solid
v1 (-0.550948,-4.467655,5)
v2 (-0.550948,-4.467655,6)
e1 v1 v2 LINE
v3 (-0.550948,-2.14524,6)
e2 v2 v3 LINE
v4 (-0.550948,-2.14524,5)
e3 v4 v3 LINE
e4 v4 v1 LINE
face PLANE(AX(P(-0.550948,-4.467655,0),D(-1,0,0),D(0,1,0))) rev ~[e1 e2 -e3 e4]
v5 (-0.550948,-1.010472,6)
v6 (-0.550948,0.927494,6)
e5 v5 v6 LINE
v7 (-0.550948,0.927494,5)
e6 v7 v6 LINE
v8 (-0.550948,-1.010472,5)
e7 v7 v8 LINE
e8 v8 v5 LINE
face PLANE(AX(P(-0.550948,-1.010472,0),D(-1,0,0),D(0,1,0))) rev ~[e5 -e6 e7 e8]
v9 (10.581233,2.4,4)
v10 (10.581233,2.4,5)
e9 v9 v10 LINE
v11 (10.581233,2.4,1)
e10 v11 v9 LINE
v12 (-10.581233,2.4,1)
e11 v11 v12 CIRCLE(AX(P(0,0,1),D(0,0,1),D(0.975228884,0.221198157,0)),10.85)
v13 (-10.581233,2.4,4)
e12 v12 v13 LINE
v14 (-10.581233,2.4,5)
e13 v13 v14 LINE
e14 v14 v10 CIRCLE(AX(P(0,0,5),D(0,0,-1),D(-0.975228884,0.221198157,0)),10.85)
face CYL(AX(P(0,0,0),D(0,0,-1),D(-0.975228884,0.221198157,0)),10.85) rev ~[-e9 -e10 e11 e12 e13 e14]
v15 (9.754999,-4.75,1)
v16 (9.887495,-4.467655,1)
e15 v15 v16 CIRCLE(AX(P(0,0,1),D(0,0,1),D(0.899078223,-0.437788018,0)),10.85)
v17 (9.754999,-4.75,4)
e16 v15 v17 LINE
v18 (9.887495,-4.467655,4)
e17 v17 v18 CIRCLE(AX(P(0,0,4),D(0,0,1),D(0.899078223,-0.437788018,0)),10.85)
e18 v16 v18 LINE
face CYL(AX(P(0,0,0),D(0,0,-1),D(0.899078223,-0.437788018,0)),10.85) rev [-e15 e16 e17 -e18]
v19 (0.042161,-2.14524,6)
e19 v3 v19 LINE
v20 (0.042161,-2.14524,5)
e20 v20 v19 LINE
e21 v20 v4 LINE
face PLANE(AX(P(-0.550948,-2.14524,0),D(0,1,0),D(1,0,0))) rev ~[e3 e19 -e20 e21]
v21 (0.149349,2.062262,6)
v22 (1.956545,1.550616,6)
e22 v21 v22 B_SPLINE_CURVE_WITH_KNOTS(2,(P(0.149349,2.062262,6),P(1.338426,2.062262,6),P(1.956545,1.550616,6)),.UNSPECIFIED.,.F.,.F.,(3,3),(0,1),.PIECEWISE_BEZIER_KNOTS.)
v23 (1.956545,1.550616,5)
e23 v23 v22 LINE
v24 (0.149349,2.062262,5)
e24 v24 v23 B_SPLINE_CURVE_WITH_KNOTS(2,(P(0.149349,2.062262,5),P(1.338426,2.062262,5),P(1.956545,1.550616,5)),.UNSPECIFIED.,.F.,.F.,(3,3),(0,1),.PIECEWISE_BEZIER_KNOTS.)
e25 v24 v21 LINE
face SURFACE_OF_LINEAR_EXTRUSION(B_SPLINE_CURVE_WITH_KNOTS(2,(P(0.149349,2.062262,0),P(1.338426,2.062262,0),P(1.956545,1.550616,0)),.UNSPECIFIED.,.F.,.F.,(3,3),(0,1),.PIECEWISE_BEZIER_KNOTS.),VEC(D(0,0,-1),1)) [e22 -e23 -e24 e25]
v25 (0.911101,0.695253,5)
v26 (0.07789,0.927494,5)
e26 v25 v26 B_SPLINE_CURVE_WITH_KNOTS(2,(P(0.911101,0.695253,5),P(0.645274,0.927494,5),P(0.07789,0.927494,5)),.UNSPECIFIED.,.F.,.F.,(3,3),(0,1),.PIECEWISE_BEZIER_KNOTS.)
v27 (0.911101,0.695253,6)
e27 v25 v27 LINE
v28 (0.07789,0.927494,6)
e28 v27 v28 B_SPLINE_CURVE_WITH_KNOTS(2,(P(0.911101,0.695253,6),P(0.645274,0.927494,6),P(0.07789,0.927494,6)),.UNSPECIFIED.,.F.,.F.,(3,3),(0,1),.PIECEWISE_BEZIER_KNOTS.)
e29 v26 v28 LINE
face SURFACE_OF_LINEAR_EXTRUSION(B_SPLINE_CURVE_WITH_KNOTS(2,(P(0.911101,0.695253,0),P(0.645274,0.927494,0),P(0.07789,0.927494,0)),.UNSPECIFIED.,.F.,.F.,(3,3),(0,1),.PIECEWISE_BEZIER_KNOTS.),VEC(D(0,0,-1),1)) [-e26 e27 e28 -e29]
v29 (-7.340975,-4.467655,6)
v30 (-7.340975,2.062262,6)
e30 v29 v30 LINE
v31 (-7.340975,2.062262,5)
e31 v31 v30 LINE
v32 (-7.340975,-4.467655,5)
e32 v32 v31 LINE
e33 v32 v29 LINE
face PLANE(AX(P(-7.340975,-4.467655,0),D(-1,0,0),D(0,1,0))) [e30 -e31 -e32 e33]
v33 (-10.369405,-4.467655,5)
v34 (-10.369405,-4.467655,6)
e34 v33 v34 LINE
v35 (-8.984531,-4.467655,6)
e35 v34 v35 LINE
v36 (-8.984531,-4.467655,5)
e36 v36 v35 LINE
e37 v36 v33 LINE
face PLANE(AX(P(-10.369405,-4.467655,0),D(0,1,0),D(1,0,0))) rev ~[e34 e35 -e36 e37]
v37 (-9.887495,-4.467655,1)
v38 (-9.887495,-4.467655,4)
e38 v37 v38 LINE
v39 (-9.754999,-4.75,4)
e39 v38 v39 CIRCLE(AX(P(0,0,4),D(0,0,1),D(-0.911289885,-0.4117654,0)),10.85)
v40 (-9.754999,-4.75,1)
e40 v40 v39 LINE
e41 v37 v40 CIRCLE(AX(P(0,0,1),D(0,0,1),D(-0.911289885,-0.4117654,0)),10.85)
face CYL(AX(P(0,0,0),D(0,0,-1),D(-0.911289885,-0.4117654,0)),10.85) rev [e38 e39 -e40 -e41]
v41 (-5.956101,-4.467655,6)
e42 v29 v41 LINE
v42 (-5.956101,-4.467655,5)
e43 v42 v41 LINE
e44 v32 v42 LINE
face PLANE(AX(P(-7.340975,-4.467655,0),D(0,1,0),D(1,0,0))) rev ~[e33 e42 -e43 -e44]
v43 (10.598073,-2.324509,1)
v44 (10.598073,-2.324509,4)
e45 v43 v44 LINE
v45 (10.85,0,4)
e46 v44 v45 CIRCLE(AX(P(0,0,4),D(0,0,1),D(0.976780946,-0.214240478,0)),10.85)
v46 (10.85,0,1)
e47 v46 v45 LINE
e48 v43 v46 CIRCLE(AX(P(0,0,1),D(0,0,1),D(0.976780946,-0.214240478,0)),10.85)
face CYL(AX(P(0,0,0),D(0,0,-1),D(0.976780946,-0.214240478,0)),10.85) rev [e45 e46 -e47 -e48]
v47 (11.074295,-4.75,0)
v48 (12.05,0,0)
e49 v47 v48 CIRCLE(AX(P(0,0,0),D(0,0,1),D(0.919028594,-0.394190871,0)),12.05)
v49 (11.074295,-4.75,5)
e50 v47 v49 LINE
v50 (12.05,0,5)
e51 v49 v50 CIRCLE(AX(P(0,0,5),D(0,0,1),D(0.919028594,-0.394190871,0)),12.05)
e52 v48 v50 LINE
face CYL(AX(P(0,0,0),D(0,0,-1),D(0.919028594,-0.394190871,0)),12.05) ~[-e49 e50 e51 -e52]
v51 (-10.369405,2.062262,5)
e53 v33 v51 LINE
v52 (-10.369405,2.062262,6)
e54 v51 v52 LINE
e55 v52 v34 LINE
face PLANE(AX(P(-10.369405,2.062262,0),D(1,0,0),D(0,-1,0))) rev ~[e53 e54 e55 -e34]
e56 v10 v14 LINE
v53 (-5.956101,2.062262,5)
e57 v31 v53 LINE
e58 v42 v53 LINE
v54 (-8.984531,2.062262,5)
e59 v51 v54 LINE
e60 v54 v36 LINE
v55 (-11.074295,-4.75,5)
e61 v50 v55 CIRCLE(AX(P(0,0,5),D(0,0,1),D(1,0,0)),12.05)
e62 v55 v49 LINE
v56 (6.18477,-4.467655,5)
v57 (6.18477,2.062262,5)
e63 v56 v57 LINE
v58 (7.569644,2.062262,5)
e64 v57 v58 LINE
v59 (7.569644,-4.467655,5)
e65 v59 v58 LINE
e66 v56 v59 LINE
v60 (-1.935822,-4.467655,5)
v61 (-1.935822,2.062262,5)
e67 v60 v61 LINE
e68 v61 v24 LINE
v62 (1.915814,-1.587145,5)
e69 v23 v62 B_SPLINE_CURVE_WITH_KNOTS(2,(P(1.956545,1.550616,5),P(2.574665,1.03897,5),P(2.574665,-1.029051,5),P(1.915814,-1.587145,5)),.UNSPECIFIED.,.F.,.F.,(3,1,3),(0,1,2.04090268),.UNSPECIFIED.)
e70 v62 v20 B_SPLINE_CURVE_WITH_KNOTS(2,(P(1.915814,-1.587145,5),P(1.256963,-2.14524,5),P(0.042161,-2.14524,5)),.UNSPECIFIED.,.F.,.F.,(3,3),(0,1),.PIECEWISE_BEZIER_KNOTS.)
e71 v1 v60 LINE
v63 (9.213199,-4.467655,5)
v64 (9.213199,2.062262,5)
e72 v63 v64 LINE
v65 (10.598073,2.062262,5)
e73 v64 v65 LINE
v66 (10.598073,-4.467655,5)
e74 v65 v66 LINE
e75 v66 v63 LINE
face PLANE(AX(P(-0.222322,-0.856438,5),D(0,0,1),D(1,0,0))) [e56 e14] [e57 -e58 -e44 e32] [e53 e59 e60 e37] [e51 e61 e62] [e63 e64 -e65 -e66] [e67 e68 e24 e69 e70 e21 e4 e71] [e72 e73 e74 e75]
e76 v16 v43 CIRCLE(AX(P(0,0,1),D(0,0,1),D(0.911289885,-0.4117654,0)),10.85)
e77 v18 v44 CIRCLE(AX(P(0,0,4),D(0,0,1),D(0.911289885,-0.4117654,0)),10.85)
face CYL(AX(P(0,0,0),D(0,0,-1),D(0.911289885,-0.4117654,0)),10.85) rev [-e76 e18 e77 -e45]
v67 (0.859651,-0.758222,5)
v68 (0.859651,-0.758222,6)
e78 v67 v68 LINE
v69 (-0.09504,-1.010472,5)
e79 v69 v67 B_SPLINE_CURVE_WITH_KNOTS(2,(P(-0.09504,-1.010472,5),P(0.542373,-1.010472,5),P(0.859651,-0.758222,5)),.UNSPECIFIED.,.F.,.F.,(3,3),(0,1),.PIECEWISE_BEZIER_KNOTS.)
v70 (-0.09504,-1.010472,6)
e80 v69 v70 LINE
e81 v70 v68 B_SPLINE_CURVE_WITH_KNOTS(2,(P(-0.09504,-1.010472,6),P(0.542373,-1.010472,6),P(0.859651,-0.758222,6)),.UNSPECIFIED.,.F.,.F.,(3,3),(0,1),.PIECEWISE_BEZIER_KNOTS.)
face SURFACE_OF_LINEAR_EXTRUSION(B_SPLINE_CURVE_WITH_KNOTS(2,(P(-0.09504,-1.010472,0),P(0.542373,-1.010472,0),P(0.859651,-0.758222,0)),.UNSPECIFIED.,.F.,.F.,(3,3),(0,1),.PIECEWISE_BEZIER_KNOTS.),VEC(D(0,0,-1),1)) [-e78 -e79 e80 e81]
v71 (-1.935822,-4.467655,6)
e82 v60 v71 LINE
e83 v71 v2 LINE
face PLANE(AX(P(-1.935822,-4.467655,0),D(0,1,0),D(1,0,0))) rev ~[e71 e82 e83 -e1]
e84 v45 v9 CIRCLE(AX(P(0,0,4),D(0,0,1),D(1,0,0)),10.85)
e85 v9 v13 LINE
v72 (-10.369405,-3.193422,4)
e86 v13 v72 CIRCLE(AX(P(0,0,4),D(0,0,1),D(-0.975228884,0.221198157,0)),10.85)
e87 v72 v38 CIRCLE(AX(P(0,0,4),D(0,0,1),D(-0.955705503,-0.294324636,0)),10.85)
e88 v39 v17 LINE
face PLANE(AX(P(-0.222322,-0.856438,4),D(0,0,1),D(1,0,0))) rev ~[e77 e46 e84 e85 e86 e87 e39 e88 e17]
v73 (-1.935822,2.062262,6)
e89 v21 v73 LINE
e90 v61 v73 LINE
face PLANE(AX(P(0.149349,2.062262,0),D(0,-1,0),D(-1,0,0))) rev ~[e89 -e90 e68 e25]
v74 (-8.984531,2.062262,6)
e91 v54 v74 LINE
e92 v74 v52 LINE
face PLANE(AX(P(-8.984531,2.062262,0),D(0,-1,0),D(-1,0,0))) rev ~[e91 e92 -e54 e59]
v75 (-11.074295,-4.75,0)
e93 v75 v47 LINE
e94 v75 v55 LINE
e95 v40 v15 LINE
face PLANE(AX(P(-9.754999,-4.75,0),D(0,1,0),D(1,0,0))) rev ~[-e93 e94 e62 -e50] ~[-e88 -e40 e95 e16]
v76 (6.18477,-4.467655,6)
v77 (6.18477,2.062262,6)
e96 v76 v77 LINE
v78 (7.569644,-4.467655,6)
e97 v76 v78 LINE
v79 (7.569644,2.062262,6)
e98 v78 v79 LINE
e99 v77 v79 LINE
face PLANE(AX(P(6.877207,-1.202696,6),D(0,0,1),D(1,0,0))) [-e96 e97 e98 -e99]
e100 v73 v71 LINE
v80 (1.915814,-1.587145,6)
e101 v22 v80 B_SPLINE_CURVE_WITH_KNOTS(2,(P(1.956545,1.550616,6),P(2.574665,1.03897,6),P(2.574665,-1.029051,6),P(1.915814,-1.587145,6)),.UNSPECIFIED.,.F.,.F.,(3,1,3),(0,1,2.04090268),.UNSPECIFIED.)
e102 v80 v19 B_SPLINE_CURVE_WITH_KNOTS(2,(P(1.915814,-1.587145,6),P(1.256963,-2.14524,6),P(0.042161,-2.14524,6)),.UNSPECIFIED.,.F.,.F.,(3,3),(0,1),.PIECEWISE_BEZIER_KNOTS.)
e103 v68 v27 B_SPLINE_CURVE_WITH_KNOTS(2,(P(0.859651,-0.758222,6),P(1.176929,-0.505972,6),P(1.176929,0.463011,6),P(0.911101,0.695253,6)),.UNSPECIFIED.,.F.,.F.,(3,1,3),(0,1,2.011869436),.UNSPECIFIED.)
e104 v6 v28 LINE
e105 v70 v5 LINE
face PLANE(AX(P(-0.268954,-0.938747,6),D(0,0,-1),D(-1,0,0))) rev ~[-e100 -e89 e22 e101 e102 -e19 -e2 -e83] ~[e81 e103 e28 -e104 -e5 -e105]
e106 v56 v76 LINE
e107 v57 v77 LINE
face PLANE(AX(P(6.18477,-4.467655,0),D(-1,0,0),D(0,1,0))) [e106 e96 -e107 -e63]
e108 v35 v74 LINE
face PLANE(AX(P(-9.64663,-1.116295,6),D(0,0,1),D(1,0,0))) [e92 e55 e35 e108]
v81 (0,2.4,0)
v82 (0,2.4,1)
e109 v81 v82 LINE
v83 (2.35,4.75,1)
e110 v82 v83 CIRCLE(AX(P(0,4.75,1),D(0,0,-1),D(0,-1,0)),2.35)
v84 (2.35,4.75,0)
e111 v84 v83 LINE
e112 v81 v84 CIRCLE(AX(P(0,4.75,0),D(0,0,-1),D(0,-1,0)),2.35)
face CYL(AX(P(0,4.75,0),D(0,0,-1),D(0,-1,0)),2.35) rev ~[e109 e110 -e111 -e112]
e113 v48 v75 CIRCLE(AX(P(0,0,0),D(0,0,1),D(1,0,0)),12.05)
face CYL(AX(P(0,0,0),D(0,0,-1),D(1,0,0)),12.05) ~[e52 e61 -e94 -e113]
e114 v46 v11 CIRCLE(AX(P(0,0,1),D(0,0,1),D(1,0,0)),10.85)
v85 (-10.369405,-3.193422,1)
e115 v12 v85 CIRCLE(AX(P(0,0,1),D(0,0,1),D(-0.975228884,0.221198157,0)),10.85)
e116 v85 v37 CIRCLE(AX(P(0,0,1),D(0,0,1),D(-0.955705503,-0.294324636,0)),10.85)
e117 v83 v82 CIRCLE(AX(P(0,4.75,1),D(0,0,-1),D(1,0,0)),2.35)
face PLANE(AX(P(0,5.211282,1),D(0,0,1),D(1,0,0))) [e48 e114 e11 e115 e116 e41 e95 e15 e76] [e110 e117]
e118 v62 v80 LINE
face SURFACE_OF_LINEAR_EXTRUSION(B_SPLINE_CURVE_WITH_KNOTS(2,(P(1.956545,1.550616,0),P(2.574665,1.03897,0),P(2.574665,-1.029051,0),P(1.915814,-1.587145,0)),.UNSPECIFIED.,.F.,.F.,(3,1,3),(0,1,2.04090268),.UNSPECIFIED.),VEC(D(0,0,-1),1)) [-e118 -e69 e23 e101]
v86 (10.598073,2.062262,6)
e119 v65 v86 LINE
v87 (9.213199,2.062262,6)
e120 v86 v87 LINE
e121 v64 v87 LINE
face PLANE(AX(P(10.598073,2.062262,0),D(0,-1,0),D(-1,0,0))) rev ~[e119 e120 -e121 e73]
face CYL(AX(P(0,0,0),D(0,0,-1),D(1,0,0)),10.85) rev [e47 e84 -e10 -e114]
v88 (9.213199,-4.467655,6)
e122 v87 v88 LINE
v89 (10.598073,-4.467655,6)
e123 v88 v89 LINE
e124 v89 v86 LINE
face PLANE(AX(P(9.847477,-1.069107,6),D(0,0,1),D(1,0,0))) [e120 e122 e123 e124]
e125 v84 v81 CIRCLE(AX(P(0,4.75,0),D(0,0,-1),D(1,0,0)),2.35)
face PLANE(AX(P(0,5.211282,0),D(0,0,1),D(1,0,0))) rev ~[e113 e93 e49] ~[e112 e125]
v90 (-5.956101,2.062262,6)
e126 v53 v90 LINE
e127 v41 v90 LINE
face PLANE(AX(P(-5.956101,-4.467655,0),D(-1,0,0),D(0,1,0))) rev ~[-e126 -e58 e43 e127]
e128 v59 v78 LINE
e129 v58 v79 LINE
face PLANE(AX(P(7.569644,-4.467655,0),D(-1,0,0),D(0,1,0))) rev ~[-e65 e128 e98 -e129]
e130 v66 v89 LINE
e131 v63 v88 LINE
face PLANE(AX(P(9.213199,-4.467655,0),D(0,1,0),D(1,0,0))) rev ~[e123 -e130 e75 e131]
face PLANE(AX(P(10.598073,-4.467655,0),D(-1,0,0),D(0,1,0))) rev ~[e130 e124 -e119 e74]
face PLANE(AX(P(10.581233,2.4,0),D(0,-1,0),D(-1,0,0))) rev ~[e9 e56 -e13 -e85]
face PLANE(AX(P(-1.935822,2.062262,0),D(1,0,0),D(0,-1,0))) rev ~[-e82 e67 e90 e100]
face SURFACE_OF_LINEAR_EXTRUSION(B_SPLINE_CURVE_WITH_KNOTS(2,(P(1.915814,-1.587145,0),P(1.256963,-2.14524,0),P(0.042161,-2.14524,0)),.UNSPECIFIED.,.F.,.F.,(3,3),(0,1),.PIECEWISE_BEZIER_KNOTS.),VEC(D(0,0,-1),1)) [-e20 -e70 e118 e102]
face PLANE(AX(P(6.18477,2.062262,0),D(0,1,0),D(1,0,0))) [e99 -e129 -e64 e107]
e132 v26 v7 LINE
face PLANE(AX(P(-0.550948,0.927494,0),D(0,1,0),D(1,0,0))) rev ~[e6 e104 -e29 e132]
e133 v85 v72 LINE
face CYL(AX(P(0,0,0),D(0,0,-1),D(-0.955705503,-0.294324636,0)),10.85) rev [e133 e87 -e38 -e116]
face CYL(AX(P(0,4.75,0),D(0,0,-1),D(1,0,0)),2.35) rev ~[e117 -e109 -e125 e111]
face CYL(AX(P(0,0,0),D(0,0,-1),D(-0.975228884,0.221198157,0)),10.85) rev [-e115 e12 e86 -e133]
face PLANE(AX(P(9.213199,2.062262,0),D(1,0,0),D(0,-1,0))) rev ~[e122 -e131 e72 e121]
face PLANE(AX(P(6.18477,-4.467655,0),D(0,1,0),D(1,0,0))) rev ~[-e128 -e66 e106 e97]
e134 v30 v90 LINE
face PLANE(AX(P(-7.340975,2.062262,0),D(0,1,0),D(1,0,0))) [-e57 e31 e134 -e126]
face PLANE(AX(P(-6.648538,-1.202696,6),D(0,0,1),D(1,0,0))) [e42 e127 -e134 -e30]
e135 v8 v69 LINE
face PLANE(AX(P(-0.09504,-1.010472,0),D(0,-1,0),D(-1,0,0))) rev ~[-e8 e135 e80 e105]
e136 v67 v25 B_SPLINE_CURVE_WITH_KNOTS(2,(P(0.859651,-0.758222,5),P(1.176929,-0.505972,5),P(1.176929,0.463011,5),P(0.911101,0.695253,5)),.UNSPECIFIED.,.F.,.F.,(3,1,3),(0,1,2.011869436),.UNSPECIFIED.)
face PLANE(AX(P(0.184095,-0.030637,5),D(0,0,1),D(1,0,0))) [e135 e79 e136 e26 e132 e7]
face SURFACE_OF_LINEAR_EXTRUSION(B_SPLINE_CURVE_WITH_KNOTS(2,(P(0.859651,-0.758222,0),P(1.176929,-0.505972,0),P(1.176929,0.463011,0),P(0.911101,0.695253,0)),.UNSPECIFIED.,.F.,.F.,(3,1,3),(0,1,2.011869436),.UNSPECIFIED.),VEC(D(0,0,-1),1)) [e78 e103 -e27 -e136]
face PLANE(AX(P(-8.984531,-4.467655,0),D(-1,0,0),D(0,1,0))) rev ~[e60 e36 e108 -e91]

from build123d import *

# Parameters (mm, degrees)
F0_W     = 1.3848739799
F0_H     = 6.5299166297
F1_DEPTH = 5
F2_DEPTH = 6
F3_DEPTH = 4
F4_DEPTH = 1


# Not quite as in the source:
# - a feature names something its author has since deleted; it is built from what else it names


with BuildPart() as f1:
    # F0 (on Top) → F1 (new body)
    with BuildSketch(Plane.XY):
        with BuildLine():
            ThreePointArc((-9.8874952566, -4.4676545918), (-9.8222615585, -4.6093034047), (-9.7549987186, -4.75))
            Line((-9.7549987186, -4.75), (9.7549987186, -4.75))
            ThreePointArc((9.7549987186, -4.75), (9.8222615585, -4.6093034047), (9.8874952566, -4.4676545918))
            Line((9.8874952566, -4.4676545918), (9.2131992894, -4.4676545918))
            Line((9.2131992894, -4.4676545918), (9.2131992894, 2.062262038))
            Line((9.2131992894, 2.062262038), (10.5980732693, 2.062262038))
            Line((10.5980732693, 2.062262038), (10.5980732693, -2.3245091907))
            ThreePointArc((10.5980732693, -2.3245091907), (10.7868344516, -1.1690605262), (10.85, 0))
            ThreePointArc((10.85, 0), (10.7825989969, 1.2075010861), (10.5812333875, 2.4))
            Line((10.5812333875, 2.4), (0, 2.4))
            Line((0, 2.4), (-10.5812333875, 2.4))
            ThreePointArc((-10.5812333875, 2.4), (-10.8422277422, -0.4106063639), (-10.3694047071, -3.1934223053))
            Line((-10.3694047071, -3.1934223053), (-10.3694047071, 2.062262038))
            Line((-10.3694047071, 2.062262038), (-8.9845307272, 2.062262038))
            Line((-8.9845307272, 2.062262038), (-8.9845307272, -4.4676545918))
            Line((-8.9845307272, -4.4676545918), (-9.8874952566, -4.4676545918))
        make_face()
        with Locations((-6.6485384464, -1.2026962769)):
            Rectangle(F0_W, F0_H, mode=Mode.SUBTRACT)
        with BuildLine():
            add(Edge.make_bspline(
                [(1.9565453854, 1.55061613), (2.5746650927, 1.0389702221), (2.5746650927, 0.0256826557)],
                knots=[0, 0, 0, 1, 1, 1], degree=2))
            add(Edge.make_bspline(
                [(2.5746650927, 0.0256826557), (2.5746650927, -1.0290510875), (1.9158137978, -1.5871452971)],
                knots=[0, 0, 0, 1, 1, 1], degree=2))
            add(Edge.make_bspline(
                [(1.9158137978, -1.5871452971), (1.2569625029, -2.1452395068), (0.0421607662, -2.1452395068)],
                knots=[0, 0, 0, 1, 1, 1], degree=2))
            Line((0.0421607662, -2.1452395068), (-0.5509483171, -2.1452395068))
            Line((-0.5509483171, -2.1452395068), (-0.5509483171, -4.4676545918))
            Line((-0.5509483171, -4.4676545918), (-1.935822297, -4.4676545918))
            Line((-1.935822297, -4.4676545918), (-1.935822297, 2.062262038))
            Line((-1.935822297, 2.062262038), (0.1493491547, 2.062262038))
            add(Edge.make_bspline(
                [(0.1493491547, 2.062262038), (1.3384256782, 2.062262038), (1.9565453854, 1.55061613)],
                knots=[0, 0, 0, 1, 1, 1], degree=2))
        make_face(mode=Mode.SUBTRACT)
        with Locations((6.8772070086, -1.2026962769)):
            Rectangle(F0_W, F0_H, mode=Mode.SUBTRACT)
        with BuildLine():
            ThreePointArc((11.0742945599, -4.75), (11.8035534787, -2.4245876508), (12.05, 0))
            ThreePointArc((12.05, 0), (-2.4245876508, 11.8035534787), (-11.0742945599, -4.75))
            Line((-11.0742945599, -4.75), (-9.7549987186, -4.75))
            ThreePointArc((-9.7549987186, -4.75), (-9.8222615585, -4.6093034047), (-9.8874952566, -4.4676545918))
            Line((-9.8874952566, -4.4676545918), (-10.3694047071, -4.4676545918))
            Line((-10.3694047071, -4.4676545918), (-10.3694047071, -3.1934223053))
            ThreePointArc((-10.3694047071, -3.1934223053), (-10.8422277422, -0.4106063639), (-10.5812333875, 2.4))
            ThreePointArc((-10.5812333875, 2.4), (0, 10.85), (10.5812333875, 2.4))
            ThreePointArc((10.5812333875, 2.4), (10.7825989969, 1.2075010861), (10.85, 0))
            ThreePointArc((10.85, 0), (10.7868344516, -1.1690605262), (10.5980732693, -2.3245091907))
            Line((10.5980732693, -2.3245091907), (10.5980732693, -4.4676545918))
            Line((10.5980732693, -4.4676545918), (9.8874952566, -4.4676545918))
            ThreePointArc((9.8874952566, -4.4676545918), (9.8222615585, -4.6093034047), (9.7549987186, -4.75))
            Line((9.7549987186, -4.75), (11.0742945599, -4.75))
        make_face()
        with BuildLine():
            Line((-0.5509483171, 0.927494298), (-0.5509483171, -1.0104717668))
            Line((-0.5509483171, -1.0104717668), (-0.0950403712, -1.0104717668))
            add(Edge.make_bspline(
                [(-0.0950403712, -1.0104717668), (0.542373246, -1.0104717668), (0.8596508761, -0.7582217591)],
                knots=[0, 0, 0, 1, 1, 1], degree=2))
            add(Edge.make_bspline(
                [(0.8596508761, -0.7582217591), (1.1769285061, -0.5059717514), (1.1769285061, -0.0243385922)],
                knots=[0, 0, 0, 1, 1, 1], degree=2))
            add(Edge.make_bspline(
                [(1.1769285061, -0.0243385922), (1.1769285061, 0.463011281), (0.9111013026, 0.6952527895)],
                knots=[0, 0, 0, 1, 1, 1], degree=2))
            add(Edge.make_bspline(
                [(0.9111013026, 0.6952527895), (0.645274099, 0.927494298), (0.077890229, 0.927494298)],
                knots=[0, 0, 0, 1, 1, 1], degree=2))
            Line((0.077890229, 0.927494298), (-0.5509483171, 0.927494298))
        make_face()
    extrude(amount=F1_DEPTH)

    # F0 (on Top) → F2 (join)
    with BuildSketch(Plane.XY):
        with BuildLine():
            ThreePointArc((-10.3694047071, -3.1934223053), (-10.1484686537, -3.8381094285), (-9.8874952566, -4.4676545918))
            Line((-9.8874952566, -4.4676545918), (-8.9845307272, -4.4676545918))
            Line((-8.9845307272, -4.4676545918), (-8.9845307272, 2.062262038))
            Line((-8.9845307272, 2.062262038), (-10.3694047071, 2.062262038))
            Line((-10.3694047071, 2.062262038), (-10.3694047071, -3.1934223053))
        make_face()
        with BuildLine():
            Line((-10.3694047071, -4.4676545918), (-9.8874952566, -4.4676545918))
            ThreePointArc((-9.8874952566, -4.4676545918), (-10.1484686537, -3.8381094285), (-10.3694047071, -3.1934223053))
            Line((-10.3694047071, -3.1934223053), (-10.3694047071, -4.4676545918))
        make_face()
        with Locations((-6.6485384464, -1.2026962769)):
            Rectangle(F0_W, F0_H)
        with BuildLine():
            add(Edge.make_bspline(
                [(2.5746650927, 0.0256826557), (2.5746650927, -1.0290510875), (1.9158137978, -1.5871452971)],
                knots=[0, 0, 0, 1, 1, 1], degree=2))
            add(Edge.make_bspline(
                [(1.9565453854, 1.55061613), (2.5746650927, 1.0389702221), (2.5746650927, 0.0256826557)],
                knots=[0, 0, 0, 1, 1, 1], degree=2))
            add(Edge.make_bspline(
                [(0.1493491547, 2.062262038), (1.3384256782, 2.062262038), (1.9565453854, 1.55061613)],
                knots=[0, 0, 0, 1, 1, 1], degree=2))
            Line((0.1493491547, 2.062262038), (-1.935822297, 2.062262038))
            Line((-1.935822297, 2.062262038), (-1.935822297, -4.4676545918))
            Line((-1.935822297, -4.4676545918), (-0.5509483171, -4.4676545918))
            Line((-0.5509483171, -4.4676545918), (-0.5509483171, -2.1452395068))
            Line((-0.5509483171, -2.1452395068), (0.0421607662, -2.1452395068))
            add(Edge.make_bspline(
                [(1.9158137978, -1.5871452971), (1.2569625029, -2.1452395068), (0.0421607662, -2.1452395068)],
                knots=[0, 0, 0, 1, 1, 1], degree=2))
        make_face()
        with BuildLine():
            Line((-0.0950403712, -1.0104717668), (-0.5509483171, -1.0104717668))
            Line((-0.5509483171, -1.0104717668), (-0.5509483171, 0.927494298))
            Line((-0.5509483171, 0.927494298), (0.077890229, 0.927494298))
            add(Edge.make_bspline(
                [(0.9111013026, 0.6952527895), (0.645274099, 0.927494298), (0.077890229, 0.927494298)],
                knots=[0, 0, 0, 1, 1, 1], degree=2))
            add(Edge.make_bspline(
                [(1.1769285061, -0.0243385922), (1.1769285061, 0.463011281), (0.9111013026, 0.6952527895)],
                knots=[0, 0, 0, 1, 1, 1], degree=2))
            add(Edge.make_bspline(
                [(0.8596508761, -0.7582217591), (1.1769285061, -0.5059717514), (1.1769285061, -0.0243385922)],
                knots=[0, 0, 0, 1, 1, 1], degree=2))
            add(Edge.make_bspline(
                [(-0.0950403712, -1.0104717668), (0.542373246, -1.0104717668), (0.8596508761, -0.7582217591)],
                knots=[0, 0, 0, 1, 1, 1], degree=2))
        make_face(mode=Mode.SUBTRACT)
        with Locations((6.8772070086, -1.2026962769)):
            Rectangle(F0_W, F0_H)
        with BuildLine():
            Line((9.2131992894, -4.4676545918), (9.8874952566, -4.4676545918))
            ThreePointArc((9.8874952566, -4.4676545918), (10.2986842611, -3.4146160092), (10.5980732693, -2.3245091907))
            Line((10.5980732693, -2.3245091907), (10.5980732693, 2.062262038))
            Line((10.5980732693, 2.062262038), (9.2131992894, 2.062262038))
            Line((9.2131992894, 2.062262038), (9.2131992894, -4.4676545918))
        make_face()
        with BuildLine():
            ThreePointArc((10.5980732693, -2.3245091907), (10.2986842611, -3.4146160092), (9.8874952566, -4.4676545918))
            Line((9.8874952566, -4.4676545918), (10.5980732693, -4.4676545918))
            Line((10.5980732693, -4.4676545918), (10.5980732693, -2.3245091907))
        make_face()
    extrude(amount=F2_DEPTH)

    # F0 (on Top) → F3 (cut)
    with BuildSketch(Plane.XY):
        with BuildLine():
            ThreePointArc((-9.8874952566, -4.4676545918), (-9.8222615585, -4.6093034047), (-9.7549987186, -4.75))
            Line((-9.7549987186, -4.75), (9.7549987186, -4.75))
            ThreePointArc((9.7549987186, -4.75), (9.8222615585, -4.6093034047), (9.8874952566, -4.4676545918))
            Line((9.8874952566, -4.4676545918), (9.2131992894, -4.4676545918))
            Line((9.2131992894, -4.4676545918), (9.2131992894, 2.062262038))
            Line((9.2131992894, 2.062262038), (10.5980732693, 2.062262038))
            Line((10.5980732693, 2.062262038), (10.5980732693, -2.3245091907))
            ThreePointArc((10.5980732693, -2.3245091907), (10.7868344516, -1.1690605262), (10.85, 0))
            ThreePointArc((10.85, 0), (10.7825989969, 1.2075010861), (10.5812333875, 2.4))
            Line((10.5812333875, 2.4), (0, 2.4))
            Line((0, 2.4), (-10.5812333875, 2.4))
            ThreePointArc((-10.5812333875, 2.4), (-10.8422277422, -0.4106063639), (-10.3694047071, -3.1934223053))
            Line((-10.3694047071, -3.1934223053), (-10.3694047071, 2.062262038))
            Line((-10.3694047071, 2.062262038), (-8.9845307272, 2.062262038))
            Line((-8.9845307272, 2.062262038), (-8.9845307272, -4.4676545918))
            Line((-8.9845307272, -4.4676545918), (-9.8874952566, -4.4676545918))
        make_face()
        with Locations((-6.6485384464, -1.2026962769)):
            Rectangle(F0_W, F0_H, mode=Mode.SUBTRACT)
        with BuildLine():
            add(Edge.make_bspline(
                [(1.9565453854, 1.55061613), (2.5746650927, 1.0389702221), (2.5746650927, 0.0256826557)],
                knots=[0, 0, 0, 1, 1, 1], degree=2))
            add(Edge.make_bspline(
                [(2.5746650927, 0.0256826557), (2.5746650927, -1.0290510875), (1.9158137978, -1.5871452971)],
                knots=[0, 0, 0, 1, 1, 1], degree=2))
            add(Edge.make_bspline(
                [(1.9158137978, -1.5871452971), (1.2569625029, -2.1452395068), (0.0421607662, -2.1452395068)],
                knots=[0, 0, 0, 1, 1, 1], degree=2))
            Line((0.0421607662, -2.1452395068), (-0.5509483171, -2.1452395068))
            Line((-0.5509483171, -2.1452395068), (-0.5509483171, -4.4676545918))
            Line((-0.5509483171, -4.4676545918), (-1.935822297, -4.4676545918))
            Line((-1.935822297, -4.4676545918), (-1.935822297, 2.062262038))
            Line((-1.935822297, 2.062262038), (0.1493491547, 2.062262038))
            add(Edge.make_bspline(
                [(0.1493491547, 2.062262038), (1.3384256782, 2.062262038), (1.9565453854, 1.55061613)],
                knots=[0, 0, 0, 1, 1, 1], degree=2))
        make_face(mode=Mode.SUBTRACT)
        with Locations((6.8772070086, -1.2026962769)):
            Rectangle(F0_W, F0_H, mode=Mode.SUBTRACT)
        with BuildLine():
            ThreePointArc((-10.3694047071, -3.1934223053), (-10.1484686537, -3.8381094285), (-9.8874952566, -4.4676545918))
            Line((-9.8874952566, -4.4676545918), (-8.9845307272, -4.4676545918))
            Line((-8.9845307272, -4.4676545918), (-8.9845307272, 2.062262038))
            Line((-8.9845307272, 2.062262038), (-10.3694047071, 2.062262038))
            Line((-10.3694047071, 2.062262038), (-10.3694047071, -3.1934223053))
        make_face()
        with Locations((-6.6485384464, -1.2026962769)):
            Rectangle(F0_W, F0_H)
        with BuildLine():
            add(Edge.make_bspline(
                [(2.5746650927, 0.0256826557), (2.5746650927, -1.0290510875), (1.9158137978, -1.5871452971)],
                knots=[0, 0, 0, 1, 1, 1], degree=2))
            add(Edge.make_bspline(
                [(1.9565453854, 1.55061613), (2.5746650927, 1.0389702221), (2.5746650927, 0.0256826557)],
                knots=[0, 0, 0, 1, 1, 1], degree=2))
            add(Edge.make_bspline(
                [(0.1493491547, 2.062262038), (1.3384256782, 2.062262038), (1.9565453854, 1.55061613)],
                knots=[0, 0, 0, 1, 1, 1], degree=2))
            Line((0.1493491547, 2.062262038), (-1.935822297, 2.062262038))
            Line((-1.935822297, 2.062262038), (-1.935822297, -4.4676545918))
            Line((-1.935822297, -4.4676545918), (-0.5509483171, -4.4676545918))
            Line((-0.5509483171, -4.4676545918), (-0.5509483171, -2.1452395068))
            Line((-0.5509483171, -2.1452395068), (0.0421607662, -2.1452395068))
            add(Edge.make_bspline(
                [(1.9158137978, -1.5871452971), (1.2569625029, -2.1452395068), (0.0421607662, -2.1452395068)],
                knots=[0, 0, 0, 1, 1, 1], degree=2))
        make_face()
        with BuildLine():
            Line((-0.0950403712, -1.0104717668), (-0.5509483171, -1.0104717668))
            Line((-0.5509483171, -1.0104717668), (-0.5509483171, 0.927494298))
            Line((-0.5509483171, 0.927494298), (0.077890229, 0.927494298))
            add(Edge.make_bspline(
                [(0.9111013026, 0.6952527895), (0.645274099, 0.927494298), (0.077890229, 0.927494298)],
                knots=[0, 0, 0, 1, 1, 1], degree=2))
            add(Edge.make_bspline(
                [(1.1769285061, -0.0243385922), (1.1769285061, 0.463011281), (0.9111013026, 0.6952527895)],
                knots=[0, 0, 0, 1, 1, 1], degree=2))
            add(Edge.make_bspline(
                [(0.8596508761, -0.7582217591), (1.1769285061, -0.5059717514), (1.1769285061, -0.0243385922)],
                knots=[0, 0, 0, 1, 1, 1], degree=2))
            add(Edge.make_bspline(
                [(-0.0950403712, -1.0104717668), (0.542373246, -1.0104717668), (0.8596508761, -0.7582217591)],
                knots=[0, 0, 0, 1, 1, 1], degree=2))
        make_face(mode=Mode.SUBTRACT)
        with BuildLine():
            Line((-0.5509483171, 0.927494298), (-0.5509483171, -1.0104717668))
            Line((-0.5509483171, -1.0104717668), (-0.0950403712, -1.0104717668))
            add(Edge.make_bspline(
                [(-0.0950403712, -1.0104717668), (0.542373246, -1.0104717668), (0.8596508761, -0.7582217591)],
                knots=[0, 0, 0, 1, 1, 1], degree=2))
            add(Edge.make_bspline(
                [(0.8596508761, -0.7582217591), (1.1769285061, -0.5059717514), (1.1769285061, -0.0243385922)],
                knots=[0, 0, 0, 1, 1, 1], degree=2))
            add(Edge.make_bspline(
                [(1.1769285061, -0.0243385922), (1.1769285061, 0.463011281), (0.9111013026, 0.6952527895)],
                knots=[0, 0, 0, 1, 1, 1], degree=2))
            add(Edge.make_bspline(
                [(0.9111013026, 0.6952527895), (0.645274099, 0.927494298), (0.077890229, 0.927494298)],
                knots=[0, 0, 0, 1, 1, 1], degree=2))
            Line((0.077890229, 0.927494298), (-0.5509483171, 0.927494298))
        make_face()
        with Locations((6.8772070086, -1.2026962769)):
            Rectangle(F0_W, F0_H)
        with BuildLine():
            Line((9.2131992894, -4.4676545918), (9.8874952566, -4.4676545918))
            ThreePointArc((9.8874952566, -4.4676545918), (10.2986842611, -3.4146160092), (10.5980732693, -2.3245091907))
            Line((10.5980732693, -2.3245091907), (10.5980732693, 2.062262038))
            Line((10.5980732693, 2.062262038), (9.2131992894, 2.062262038))
            Line((9.2131992894, 2.062262038), (9.2131992894, -4.4676545918))
        make_face()
    extrude(amount=F3_DEPTH, mode=Mode.SUBTRACT)

    # F0 (on Top) → F4 (join)
    with BuildSketch(Plane.XY):
        with BuildLine():
            ThreePointArc((10.5812333875, 2.4), (0, 10.85), (-10.5812333875, 2.4))
            Line((-10.5812333875, 2.4), (0, 2.4))
            Line((0, 2.4), (10.5812333875, 2.4))
        make_face()
        with BuildLine():
            ThreePointArc((2.35, 4.75), (1.6617009358, 3.0882990642), (0, 2.4))
            ThreePointArc((0, 2.4), (-1.6617009358, 6.4117009358), (2.35, 4.75))
        make_face(mode=Mode.SUBTRACT)
        with BuildLine():
            ThreePointArc((-9.8874952566, -4.4676545918), (-9.8222615585, -4.6093034047), (-9.7549987186, -4.75))
            Line((-9.7549987186, -4.75), (9.7549987186, -4.75))
            ThreePointArc((9.7549987186, -4.75), (9.8222615585, -4.6093034047), (9.8874952566, -4.4676545918))
            Line((9.8874952566, -4.4676545918), (9.2131992894, -4.4676545918))
            Line((9.2131992894, -4.4676545918), (9.2131992894, 2.062262038))
            Line((9.2131992894, 2.062262038), (10.5980732693, 2.062262038))
            Line((10.5980732693, 2.062262038), (10.5980732693, -2.3245091907))
            ThreePointArc((10.5980732693, -2.3245091907), (10.7868344516, -1.1690605262), (10.85, 0))
            ThreePointArc((10.85, 0), (10.7825989969, 1.2075010861), (10.5812333875, 2.4))
            Line((10.5812333875, 2.4), (0, 2.4))
            Line((0, 2.4), (-10.5812333875, 2.4))
            ThreePointArc((-10.5812333875, 2.4), (-10.8422277422, -0.4106063639), (-10.3694047071, -3.1934223053))
            Line((-10.3694047071, -3.1934223053), (-10.3694047071, 2.062262038))
            Line((-10.3694047071, 2.062262038), (-8.9845307272, 2.062262038))
            Line((-8.9845307272, 2.062262038), (-8.9845307272, -4.4676545918))
            Line((-8.9845307272, -4.4676545918), (-9.8874952566, -4.4676545918))
        make_face()
        with Locations((-6.6485384464, -1.2026962769)):
            Rectangle(F0_W, F0_H, mode=Mode.SUBTRACT)
        with BuildLine():
            add(Edge.make_bspline(
                [(1.9565453854, 1.55061613), (2.5746650927, 1.0389702221), (2.5746650927, 0.0256826557)],
                knots=[0, 0, 0, 1, 1, 1], degree=2))
            add(Edge.make_bspline(
                [(2.5746650927, 0.0256826557), (2.5746650927, -1.0290510875), (1.9158137978, -1.5871452971)],
                knots=[0, 0, 0, 1, 1, 1], degree=2))
            add(Edge.make_bspline(
                [(1.9158137978, -1.5871452971), (1.2569625029, -2.1452395068), (0.0421607662, -2.1452395068)],
                knots=[0, 0, 0, 1, 1, 1], degree=2))
            Line((0.0421607662, -2.1452395068), (-0.5509483171, -2.1452395068))
            Line((-0.5509483171, -2.1452395068), (-0.5509483171, -4.4676545918))
            Line((-0.5509483171, -4.4676545918), (-1.935822297, -4.4676545918))
            Line((-1.935822297, -4.4676545918), (-1.935822297, 2.062262038))
            Line((-1.935822297, 2.062262038), (0.1493491547, 2.062262038))
            add(Edge.make_bspline(
                [(0.1493491547, 2.062262038), (1.3384256782, 2.062262038), (1.9565453854, 1.55061613)],
                knots=[0, 0, 0, 1, 1, 1], degree=2))
        make_face(mode=Mode.SUBTRACT)
        with Locations((6.8772070086, -1.2026962769)):
            Rectangle(F0_W, F0_H, mode=Mode.SUBTRACT)
        with BuildLine():
            ThreePointArc((-10.3694047071, -3.1934223053), (-10.1484686537, -3.8381094285), (-9.8874952566, -4.4676545918))
            Line((-9.8874952566, -4.4676545918), (-8.9845307272, -4.4676545918))
            Line((-8.9845307272, -4.4676545918), (-8.9845307272, 2.062262038))
            Line((-8.9845307272, 2.062262038), (-10.3694047071, 2.062262038))
            Line((-10.3694047071, 2.062262038), (-10.3694047071, -3.1934223053))
        make_face()
        with Locations((-6.6485384464, -1.2026962769)):
            Rectangle(F0_W, F0_H)
        with BuildLine():
            add(Edge.make_bspline(
                [(2.5746650927, 0.0256826557), (2.5746650927, -1.0290510875), (1.9158137978, -1.5871452971)],
                knots=[0, 0, 0, 1, 1, 1], degree=2))
            add(Edge.make_bspline(
                [(1.9565453854, 1.55061613), (2.5746650927, 1.0389702221), (2.5746650927, 0.0256826557)],
                knots=[0, 0, 0, 1, 1, 1], degree=2))
            add(Edge.make_bspline(
                [(0.1493491547, 2.062262038), (1.3384256782, 2.062262038), (1.9565453854, 1.55061613)],
                knots=[0, 0, 0, 1, 1, 1], degree=2))
            Line((0.1493491547, 2.062262038), (-1.935822297, 2.062262038))
            Line((-1.935822297, 2.062262038), (-1.935822297, -4.4676545918))
            Line((-1.935822297, -4.4676545918), (-0.5509483171, -4.4676545918))
            Line((-0.5509483171, -4.4676545918), (-0.5509483171, -2.1452395068))
            Line((-0.5509483171, -2.1452395068), (0.0421607662, -2.1452395068))
            add(Edge.make_bspline(
                [(1.9158137978, -1.5871452971), (1.2569625029, -2.1452395068), (0.0421607662, -2.1452395068)],
                knots=[0, 0, 0, 1, 1, 1], degree=2))
        make_face()
        with BuildLine():
            Line((-0.0950403712, -1.0104717668), (-0.5509483171, -1.0104717668))
            Line((-0.5509483171, -1.0104717668), (-0.5509483171, 0.927494298))
            Line((-0.5509483171, 0.927494298), (0.077890229, 0.927494298))
            add(Edge.make_bspline(
                [(0.9111013026, 0.6952527895), (0.645274099, 0.927494298), (0.077890229, 0.927494298)],
                knots=[0, 0, 0, 1, 1, 1], degree=2))
            add(Edge.make_bspline(
                [(1.1769285061, -0.0243385922), (1.1769285061, 0.463011281), (0.9111013026, 0.6952527895)],
                knots=[0, 0, 0, 1, 1, 1], degree=2))
            add(Edge.make_bspline(
                [(0.8596508761, -0.7582217591), (1.1769285061, -0.5059717514), (1.1769285061, -0.0243385922)],
                knots=[0, 0, 0, 1, 1, 1], degree=2))
            add(Edge.make_bspline(
                [(-0.0950403712, -1.0104717668), (0.542373246, -1.0104717668), (0.8596508761, -0.7582217591)],
                knots=[0, 0, 0, 1, 1, 1], degree=2))
        make_face(mode=Mode.SUBTRACT)
        with BuildLine():
            Line((-0.5509483171, 0.927494298), (-0.5509483171, -1.0104717668))
            Line((-0.5509483171, -1.0104717668), (-0.0950403712, -1.0104717668))
            add(Edge.make_bspline(
                [(-0.0950403712, -1.0104717668), (0.542373246, -1.0104717668), (0.8596508761, -0.7582217591)],
                knots=[0, 0, 0, 1, 1, 1], degree=2))
            add(Edge.make_bspline(
                [(0.8596508761, -0.7582217591), (1.1769285061, -0.5059717514), (1.1769285061, -0.0243385922)],
                knots=[0, 0, 0, 1, 1, 1], degree=2))
            add(Edge.make_bspline(
                [(1.1769285061, -0.0243385922), (1.1769285061, 0.463011281), (0.9111013026, 0.6952527895)],
                knots=[0, 0, 0, 1, 1, 1], degree=2))
            add(Edge.make_bspline(
                [(0.9111013026, 0.6952527895), (0.645274099, 0.927494298), (0.077890229, 0.927494298)],
                knots=[0, 0, 0, 1, 1, 1], degree=2))
            Line((0.077890229, 0.927494298), (-0.5509483171, 0.927494298))
        make_face()
        with Locations((6.8772070086, -1.2026962769)):
            Rectangle(F0_W, F0_H)
        with BuildLine():
            Line((9.2131992894, -4.4676545918), (9.8874952566, -4.4676545918))
            ThreePointArc((9.8874952566, -4.4676545918), (10.2986842611, -3.4146160092), (10.5980732693, -2.3245091907))
            Line((10.5980732693, -2.3245091907), (10.5980732693, 2.062262038))
            Line((10.5980732693, 2.062262038), (9.2131992894, 2.062262038))
            Line((9.2131992894, 2.062262038), (9.2131992894, -4.4676545918))
        make_face()
    extrude(amount=F4_DEPTH)


solid = f1.part
